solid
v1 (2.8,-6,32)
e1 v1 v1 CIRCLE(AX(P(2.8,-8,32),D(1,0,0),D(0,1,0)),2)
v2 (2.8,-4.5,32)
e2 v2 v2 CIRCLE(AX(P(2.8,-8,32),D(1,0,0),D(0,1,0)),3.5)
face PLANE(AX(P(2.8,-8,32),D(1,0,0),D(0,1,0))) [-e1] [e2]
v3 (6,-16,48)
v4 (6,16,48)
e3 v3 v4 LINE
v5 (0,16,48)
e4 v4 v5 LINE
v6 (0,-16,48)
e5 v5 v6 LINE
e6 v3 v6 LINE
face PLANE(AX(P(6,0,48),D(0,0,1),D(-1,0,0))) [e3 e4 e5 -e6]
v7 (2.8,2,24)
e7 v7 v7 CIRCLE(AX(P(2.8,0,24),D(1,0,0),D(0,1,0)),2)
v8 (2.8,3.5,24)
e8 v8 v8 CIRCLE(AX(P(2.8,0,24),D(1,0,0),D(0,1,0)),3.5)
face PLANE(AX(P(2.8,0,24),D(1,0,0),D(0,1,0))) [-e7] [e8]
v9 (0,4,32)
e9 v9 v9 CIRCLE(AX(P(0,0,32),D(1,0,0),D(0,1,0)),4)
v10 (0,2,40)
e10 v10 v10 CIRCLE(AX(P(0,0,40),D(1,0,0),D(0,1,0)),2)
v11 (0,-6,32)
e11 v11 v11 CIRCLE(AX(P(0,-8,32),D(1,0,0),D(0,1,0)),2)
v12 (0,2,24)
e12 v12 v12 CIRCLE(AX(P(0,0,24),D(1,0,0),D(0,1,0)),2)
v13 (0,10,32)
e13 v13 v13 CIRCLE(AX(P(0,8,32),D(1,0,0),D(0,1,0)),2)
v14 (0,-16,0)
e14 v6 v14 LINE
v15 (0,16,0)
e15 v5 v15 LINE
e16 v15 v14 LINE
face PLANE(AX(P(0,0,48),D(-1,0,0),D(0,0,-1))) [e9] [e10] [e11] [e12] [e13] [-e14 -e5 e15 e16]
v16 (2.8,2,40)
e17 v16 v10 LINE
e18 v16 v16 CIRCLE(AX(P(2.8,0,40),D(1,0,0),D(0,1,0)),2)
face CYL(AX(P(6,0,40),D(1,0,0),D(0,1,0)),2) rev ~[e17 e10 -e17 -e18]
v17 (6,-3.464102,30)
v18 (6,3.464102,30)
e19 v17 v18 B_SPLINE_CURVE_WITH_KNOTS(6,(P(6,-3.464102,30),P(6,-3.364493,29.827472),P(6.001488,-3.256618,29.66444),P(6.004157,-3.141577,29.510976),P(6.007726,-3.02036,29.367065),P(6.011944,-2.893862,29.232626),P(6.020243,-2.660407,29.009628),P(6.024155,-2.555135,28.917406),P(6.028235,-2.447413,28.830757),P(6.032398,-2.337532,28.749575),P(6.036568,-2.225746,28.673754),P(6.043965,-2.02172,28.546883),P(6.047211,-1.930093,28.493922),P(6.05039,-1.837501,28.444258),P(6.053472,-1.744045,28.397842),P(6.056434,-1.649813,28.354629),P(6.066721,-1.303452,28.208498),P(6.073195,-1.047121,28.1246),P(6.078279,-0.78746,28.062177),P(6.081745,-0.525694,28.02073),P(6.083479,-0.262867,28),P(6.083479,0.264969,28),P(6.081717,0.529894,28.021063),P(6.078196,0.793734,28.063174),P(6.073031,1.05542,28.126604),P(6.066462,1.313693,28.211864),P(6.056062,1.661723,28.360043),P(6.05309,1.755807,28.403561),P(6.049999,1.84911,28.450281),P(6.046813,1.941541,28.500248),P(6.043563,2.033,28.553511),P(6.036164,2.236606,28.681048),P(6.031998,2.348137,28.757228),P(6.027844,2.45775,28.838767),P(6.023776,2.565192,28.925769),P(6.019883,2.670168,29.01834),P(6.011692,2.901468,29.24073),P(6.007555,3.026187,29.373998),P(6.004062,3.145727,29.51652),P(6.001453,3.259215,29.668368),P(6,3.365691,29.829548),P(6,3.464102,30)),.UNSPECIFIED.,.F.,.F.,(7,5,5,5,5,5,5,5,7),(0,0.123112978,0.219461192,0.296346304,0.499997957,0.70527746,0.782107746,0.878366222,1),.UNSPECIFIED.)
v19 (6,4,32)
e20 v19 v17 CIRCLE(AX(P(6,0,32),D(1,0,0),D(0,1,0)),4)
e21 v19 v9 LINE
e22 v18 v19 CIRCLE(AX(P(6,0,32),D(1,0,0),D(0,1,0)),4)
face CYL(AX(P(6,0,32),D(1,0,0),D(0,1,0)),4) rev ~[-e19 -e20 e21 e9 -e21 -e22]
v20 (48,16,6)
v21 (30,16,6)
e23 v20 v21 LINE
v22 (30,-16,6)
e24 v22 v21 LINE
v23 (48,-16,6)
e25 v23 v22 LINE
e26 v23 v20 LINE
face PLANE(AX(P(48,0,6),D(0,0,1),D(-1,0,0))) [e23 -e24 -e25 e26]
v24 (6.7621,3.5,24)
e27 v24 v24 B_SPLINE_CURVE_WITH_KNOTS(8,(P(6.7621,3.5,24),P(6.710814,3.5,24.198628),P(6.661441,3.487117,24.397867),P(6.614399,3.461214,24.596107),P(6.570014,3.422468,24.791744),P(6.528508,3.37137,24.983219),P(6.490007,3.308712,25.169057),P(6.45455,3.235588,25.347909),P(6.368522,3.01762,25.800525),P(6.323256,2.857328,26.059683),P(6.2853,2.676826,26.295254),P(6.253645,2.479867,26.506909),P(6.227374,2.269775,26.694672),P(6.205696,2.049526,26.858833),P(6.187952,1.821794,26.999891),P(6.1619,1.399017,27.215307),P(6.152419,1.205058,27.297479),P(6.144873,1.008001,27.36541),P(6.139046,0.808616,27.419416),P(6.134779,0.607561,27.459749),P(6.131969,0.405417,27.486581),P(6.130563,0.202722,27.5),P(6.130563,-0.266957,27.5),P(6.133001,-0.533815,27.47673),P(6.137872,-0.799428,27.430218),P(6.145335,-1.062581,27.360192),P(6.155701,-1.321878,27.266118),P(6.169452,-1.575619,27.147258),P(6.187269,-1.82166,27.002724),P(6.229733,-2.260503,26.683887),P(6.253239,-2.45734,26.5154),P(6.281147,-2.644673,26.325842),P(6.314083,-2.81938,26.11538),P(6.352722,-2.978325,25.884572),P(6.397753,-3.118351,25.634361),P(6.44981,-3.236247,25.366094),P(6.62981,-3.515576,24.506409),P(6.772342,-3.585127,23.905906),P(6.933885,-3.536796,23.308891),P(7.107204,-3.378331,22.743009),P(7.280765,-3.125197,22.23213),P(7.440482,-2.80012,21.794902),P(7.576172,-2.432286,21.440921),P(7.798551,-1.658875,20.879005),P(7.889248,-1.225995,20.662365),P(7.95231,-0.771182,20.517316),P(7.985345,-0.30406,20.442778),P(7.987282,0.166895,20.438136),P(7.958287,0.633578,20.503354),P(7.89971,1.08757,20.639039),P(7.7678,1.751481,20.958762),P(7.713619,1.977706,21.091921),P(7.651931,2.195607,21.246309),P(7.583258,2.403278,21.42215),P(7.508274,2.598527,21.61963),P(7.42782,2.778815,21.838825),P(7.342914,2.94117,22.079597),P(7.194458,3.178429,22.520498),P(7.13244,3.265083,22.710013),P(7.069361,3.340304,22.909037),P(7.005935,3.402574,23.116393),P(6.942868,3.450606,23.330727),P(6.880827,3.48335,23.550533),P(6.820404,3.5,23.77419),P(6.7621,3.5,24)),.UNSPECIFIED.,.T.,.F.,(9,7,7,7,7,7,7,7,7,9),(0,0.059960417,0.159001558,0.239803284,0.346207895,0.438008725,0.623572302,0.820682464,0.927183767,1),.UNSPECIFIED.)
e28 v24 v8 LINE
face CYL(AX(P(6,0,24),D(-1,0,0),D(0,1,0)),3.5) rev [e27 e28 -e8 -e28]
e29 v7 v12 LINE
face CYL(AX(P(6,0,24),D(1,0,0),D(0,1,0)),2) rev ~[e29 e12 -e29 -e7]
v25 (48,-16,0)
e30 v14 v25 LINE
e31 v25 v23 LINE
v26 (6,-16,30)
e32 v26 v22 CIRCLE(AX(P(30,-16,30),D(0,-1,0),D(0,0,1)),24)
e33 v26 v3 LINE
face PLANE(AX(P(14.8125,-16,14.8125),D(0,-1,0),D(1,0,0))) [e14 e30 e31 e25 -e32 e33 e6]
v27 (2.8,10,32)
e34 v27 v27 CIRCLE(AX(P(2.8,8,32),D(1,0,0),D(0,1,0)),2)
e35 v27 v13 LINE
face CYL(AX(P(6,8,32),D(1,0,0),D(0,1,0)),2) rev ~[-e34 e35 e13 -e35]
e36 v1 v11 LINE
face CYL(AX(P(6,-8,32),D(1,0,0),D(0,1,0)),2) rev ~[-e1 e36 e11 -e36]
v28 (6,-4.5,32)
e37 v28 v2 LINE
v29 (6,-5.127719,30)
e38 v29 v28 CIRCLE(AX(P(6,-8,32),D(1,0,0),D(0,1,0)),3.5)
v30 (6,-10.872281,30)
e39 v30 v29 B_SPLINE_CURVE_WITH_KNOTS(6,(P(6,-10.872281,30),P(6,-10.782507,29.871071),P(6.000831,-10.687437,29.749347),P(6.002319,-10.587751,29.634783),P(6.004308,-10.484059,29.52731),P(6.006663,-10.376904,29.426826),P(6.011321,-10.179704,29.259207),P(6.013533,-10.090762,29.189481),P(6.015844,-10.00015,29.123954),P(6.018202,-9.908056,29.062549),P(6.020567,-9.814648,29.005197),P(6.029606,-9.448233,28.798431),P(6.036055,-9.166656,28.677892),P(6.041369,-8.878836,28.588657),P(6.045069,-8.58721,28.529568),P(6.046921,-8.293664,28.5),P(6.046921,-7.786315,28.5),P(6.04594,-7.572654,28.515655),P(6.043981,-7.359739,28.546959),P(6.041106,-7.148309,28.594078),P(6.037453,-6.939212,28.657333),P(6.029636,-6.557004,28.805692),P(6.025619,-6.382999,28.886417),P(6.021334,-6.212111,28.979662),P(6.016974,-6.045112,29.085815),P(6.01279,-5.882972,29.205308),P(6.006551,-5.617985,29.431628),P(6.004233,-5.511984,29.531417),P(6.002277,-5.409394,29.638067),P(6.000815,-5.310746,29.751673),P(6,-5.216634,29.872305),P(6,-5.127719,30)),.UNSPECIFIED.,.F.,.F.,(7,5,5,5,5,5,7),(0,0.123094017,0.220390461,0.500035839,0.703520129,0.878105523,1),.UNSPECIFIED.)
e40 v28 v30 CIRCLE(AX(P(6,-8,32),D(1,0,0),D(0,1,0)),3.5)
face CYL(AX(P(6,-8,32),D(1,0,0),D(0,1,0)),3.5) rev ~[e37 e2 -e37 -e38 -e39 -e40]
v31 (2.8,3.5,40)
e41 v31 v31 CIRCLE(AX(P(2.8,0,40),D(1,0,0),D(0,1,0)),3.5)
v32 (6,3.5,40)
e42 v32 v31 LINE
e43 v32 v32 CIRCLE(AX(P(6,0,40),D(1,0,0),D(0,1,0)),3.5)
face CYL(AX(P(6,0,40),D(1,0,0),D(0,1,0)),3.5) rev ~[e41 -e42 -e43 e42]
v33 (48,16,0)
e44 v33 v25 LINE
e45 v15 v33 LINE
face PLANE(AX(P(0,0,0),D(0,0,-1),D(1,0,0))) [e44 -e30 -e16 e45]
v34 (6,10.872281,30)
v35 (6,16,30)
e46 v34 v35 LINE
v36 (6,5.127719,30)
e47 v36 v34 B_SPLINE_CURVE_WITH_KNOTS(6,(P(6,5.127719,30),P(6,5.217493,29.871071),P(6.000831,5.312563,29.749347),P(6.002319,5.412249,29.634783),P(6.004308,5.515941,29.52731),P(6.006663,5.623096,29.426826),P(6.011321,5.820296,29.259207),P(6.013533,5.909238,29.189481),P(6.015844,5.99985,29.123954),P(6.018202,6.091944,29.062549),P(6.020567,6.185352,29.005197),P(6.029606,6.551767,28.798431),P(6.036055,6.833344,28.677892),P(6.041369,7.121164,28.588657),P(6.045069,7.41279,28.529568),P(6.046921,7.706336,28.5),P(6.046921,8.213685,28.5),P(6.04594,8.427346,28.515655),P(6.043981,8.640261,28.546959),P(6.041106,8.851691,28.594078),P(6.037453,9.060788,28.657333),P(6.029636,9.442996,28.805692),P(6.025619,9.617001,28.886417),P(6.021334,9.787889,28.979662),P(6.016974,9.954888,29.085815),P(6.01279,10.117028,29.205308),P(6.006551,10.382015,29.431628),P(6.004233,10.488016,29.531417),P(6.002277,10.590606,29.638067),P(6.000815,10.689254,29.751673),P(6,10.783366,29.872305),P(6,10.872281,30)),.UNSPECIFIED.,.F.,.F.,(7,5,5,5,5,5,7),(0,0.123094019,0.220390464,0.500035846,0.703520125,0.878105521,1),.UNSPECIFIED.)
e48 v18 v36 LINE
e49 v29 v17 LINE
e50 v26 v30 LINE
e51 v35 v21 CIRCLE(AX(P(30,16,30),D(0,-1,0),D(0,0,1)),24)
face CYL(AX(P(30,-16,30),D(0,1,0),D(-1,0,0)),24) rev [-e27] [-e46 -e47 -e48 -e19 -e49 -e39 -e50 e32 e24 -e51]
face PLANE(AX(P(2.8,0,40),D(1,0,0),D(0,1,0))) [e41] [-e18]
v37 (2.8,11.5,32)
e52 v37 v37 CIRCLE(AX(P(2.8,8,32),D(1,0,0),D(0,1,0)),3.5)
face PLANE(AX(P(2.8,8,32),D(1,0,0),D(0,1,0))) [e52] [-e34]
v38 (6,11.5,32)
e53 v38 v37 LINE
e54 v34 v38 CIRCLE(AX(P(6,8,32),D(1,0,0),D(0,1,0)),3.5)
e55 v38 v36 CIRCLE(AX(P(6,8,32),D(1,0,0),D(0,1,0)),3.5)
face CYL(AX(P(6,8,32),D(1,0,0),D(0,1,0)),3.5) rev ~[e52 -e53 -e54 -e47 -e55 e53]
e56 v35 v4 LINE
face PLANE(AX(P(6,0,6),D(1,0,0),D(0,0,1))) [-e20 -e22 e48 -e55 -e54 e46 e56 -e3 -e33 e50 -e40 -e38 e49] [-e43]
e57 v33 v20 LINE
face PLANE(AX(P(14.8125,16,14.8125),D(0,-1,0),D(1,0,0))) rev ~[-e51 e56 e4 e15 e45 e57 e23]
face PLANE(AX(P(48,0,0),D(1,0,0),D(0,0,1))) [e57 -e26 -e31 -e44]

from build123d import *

# Parameters (mm, degrees)
F5_DEPTH      = 16
F7_R          = 24
F6_R          = 2
F6_R_2        = 4
F8_DEPTH      = 6.001
F8_DEPTH_BACK = 42.001
F6_R_3        = 3.5
F9_DEPTH      = 3.2
F9_DEPTH_BACK = 42.001


with BuildPart() as f5:
    # F4 (on Front) → F5 (new body, symmetric)
    with BuildSketch(Plane.XZ):
        Polygon((6, 48), (0, 48), (0, 0), (48, 0), (48, 6), (6, 6), align=None)
    extrude(amount=F5_DEPTH, both=True)

    # F7
    f7_edges = [f5.edges().sort_by_distance(p)[0] for p in [
        (6, 0, 6),
    ]]
    fillet(f7_edges, radius=F7_R)

    # F6 (on face) → F8 (cut, two sides)
    with BuildSketch(Plane.YZ.offset(6)) as f8_sk:
        with Locations((-8, 32)):
            Circle(F6_R)
        with Locations((0, 40)):
            Circle(F6_R)
        with Locations((8, 32)):
            Circle(F6_R)
        with Locations((0, 32)):
            Circle(F6_R_2)
        with Locations((0, 24)):
            Circle(F6_R)
    extrude(amount=-F8_DEPTH, mode=Mode.SUBTRACT)
    extrude(f8_sk.sketch, amount=F8_DEPTH_BACK, mode=Mode.SUBTRACT)

    # F6 (on face) → F9 (cut, two sides)
    with BuildSketch(Plane.YZ.offset(6)) as f9_sk:
        with Locations((-8, 32)):
            Circle(F6_R_3)
        with Locations((-8, 32)):
            Circle(F6_R, mode=Mode.SUBTRACT)
        with Locations((0, 40)):
            Circle(F6_R_3)
        with Locations((0, 40)):
            Circle(F6_R, mode=Mode.SUBTRACT)
        with Locations((8, 32)):
            Circle(F6_R_3)
        with Locations((8, 32)):
            Circle(F6_R, mode=Mode.SUBTRACT)
        with Locations((0, 24)):
            Circle(F6_R_3)
        with Locations((0, 24)):
            Circle(F6_R, mode=Mode.SUBTRACT)
    extrude(amount=-F9_DEPTH, mode=Mode.SUBTRACT)
    extrude(f9_sk.sketch, amount=F9_DEPTH_BACK, mode=Mode.SUBTRACT)


solid = f5.part
